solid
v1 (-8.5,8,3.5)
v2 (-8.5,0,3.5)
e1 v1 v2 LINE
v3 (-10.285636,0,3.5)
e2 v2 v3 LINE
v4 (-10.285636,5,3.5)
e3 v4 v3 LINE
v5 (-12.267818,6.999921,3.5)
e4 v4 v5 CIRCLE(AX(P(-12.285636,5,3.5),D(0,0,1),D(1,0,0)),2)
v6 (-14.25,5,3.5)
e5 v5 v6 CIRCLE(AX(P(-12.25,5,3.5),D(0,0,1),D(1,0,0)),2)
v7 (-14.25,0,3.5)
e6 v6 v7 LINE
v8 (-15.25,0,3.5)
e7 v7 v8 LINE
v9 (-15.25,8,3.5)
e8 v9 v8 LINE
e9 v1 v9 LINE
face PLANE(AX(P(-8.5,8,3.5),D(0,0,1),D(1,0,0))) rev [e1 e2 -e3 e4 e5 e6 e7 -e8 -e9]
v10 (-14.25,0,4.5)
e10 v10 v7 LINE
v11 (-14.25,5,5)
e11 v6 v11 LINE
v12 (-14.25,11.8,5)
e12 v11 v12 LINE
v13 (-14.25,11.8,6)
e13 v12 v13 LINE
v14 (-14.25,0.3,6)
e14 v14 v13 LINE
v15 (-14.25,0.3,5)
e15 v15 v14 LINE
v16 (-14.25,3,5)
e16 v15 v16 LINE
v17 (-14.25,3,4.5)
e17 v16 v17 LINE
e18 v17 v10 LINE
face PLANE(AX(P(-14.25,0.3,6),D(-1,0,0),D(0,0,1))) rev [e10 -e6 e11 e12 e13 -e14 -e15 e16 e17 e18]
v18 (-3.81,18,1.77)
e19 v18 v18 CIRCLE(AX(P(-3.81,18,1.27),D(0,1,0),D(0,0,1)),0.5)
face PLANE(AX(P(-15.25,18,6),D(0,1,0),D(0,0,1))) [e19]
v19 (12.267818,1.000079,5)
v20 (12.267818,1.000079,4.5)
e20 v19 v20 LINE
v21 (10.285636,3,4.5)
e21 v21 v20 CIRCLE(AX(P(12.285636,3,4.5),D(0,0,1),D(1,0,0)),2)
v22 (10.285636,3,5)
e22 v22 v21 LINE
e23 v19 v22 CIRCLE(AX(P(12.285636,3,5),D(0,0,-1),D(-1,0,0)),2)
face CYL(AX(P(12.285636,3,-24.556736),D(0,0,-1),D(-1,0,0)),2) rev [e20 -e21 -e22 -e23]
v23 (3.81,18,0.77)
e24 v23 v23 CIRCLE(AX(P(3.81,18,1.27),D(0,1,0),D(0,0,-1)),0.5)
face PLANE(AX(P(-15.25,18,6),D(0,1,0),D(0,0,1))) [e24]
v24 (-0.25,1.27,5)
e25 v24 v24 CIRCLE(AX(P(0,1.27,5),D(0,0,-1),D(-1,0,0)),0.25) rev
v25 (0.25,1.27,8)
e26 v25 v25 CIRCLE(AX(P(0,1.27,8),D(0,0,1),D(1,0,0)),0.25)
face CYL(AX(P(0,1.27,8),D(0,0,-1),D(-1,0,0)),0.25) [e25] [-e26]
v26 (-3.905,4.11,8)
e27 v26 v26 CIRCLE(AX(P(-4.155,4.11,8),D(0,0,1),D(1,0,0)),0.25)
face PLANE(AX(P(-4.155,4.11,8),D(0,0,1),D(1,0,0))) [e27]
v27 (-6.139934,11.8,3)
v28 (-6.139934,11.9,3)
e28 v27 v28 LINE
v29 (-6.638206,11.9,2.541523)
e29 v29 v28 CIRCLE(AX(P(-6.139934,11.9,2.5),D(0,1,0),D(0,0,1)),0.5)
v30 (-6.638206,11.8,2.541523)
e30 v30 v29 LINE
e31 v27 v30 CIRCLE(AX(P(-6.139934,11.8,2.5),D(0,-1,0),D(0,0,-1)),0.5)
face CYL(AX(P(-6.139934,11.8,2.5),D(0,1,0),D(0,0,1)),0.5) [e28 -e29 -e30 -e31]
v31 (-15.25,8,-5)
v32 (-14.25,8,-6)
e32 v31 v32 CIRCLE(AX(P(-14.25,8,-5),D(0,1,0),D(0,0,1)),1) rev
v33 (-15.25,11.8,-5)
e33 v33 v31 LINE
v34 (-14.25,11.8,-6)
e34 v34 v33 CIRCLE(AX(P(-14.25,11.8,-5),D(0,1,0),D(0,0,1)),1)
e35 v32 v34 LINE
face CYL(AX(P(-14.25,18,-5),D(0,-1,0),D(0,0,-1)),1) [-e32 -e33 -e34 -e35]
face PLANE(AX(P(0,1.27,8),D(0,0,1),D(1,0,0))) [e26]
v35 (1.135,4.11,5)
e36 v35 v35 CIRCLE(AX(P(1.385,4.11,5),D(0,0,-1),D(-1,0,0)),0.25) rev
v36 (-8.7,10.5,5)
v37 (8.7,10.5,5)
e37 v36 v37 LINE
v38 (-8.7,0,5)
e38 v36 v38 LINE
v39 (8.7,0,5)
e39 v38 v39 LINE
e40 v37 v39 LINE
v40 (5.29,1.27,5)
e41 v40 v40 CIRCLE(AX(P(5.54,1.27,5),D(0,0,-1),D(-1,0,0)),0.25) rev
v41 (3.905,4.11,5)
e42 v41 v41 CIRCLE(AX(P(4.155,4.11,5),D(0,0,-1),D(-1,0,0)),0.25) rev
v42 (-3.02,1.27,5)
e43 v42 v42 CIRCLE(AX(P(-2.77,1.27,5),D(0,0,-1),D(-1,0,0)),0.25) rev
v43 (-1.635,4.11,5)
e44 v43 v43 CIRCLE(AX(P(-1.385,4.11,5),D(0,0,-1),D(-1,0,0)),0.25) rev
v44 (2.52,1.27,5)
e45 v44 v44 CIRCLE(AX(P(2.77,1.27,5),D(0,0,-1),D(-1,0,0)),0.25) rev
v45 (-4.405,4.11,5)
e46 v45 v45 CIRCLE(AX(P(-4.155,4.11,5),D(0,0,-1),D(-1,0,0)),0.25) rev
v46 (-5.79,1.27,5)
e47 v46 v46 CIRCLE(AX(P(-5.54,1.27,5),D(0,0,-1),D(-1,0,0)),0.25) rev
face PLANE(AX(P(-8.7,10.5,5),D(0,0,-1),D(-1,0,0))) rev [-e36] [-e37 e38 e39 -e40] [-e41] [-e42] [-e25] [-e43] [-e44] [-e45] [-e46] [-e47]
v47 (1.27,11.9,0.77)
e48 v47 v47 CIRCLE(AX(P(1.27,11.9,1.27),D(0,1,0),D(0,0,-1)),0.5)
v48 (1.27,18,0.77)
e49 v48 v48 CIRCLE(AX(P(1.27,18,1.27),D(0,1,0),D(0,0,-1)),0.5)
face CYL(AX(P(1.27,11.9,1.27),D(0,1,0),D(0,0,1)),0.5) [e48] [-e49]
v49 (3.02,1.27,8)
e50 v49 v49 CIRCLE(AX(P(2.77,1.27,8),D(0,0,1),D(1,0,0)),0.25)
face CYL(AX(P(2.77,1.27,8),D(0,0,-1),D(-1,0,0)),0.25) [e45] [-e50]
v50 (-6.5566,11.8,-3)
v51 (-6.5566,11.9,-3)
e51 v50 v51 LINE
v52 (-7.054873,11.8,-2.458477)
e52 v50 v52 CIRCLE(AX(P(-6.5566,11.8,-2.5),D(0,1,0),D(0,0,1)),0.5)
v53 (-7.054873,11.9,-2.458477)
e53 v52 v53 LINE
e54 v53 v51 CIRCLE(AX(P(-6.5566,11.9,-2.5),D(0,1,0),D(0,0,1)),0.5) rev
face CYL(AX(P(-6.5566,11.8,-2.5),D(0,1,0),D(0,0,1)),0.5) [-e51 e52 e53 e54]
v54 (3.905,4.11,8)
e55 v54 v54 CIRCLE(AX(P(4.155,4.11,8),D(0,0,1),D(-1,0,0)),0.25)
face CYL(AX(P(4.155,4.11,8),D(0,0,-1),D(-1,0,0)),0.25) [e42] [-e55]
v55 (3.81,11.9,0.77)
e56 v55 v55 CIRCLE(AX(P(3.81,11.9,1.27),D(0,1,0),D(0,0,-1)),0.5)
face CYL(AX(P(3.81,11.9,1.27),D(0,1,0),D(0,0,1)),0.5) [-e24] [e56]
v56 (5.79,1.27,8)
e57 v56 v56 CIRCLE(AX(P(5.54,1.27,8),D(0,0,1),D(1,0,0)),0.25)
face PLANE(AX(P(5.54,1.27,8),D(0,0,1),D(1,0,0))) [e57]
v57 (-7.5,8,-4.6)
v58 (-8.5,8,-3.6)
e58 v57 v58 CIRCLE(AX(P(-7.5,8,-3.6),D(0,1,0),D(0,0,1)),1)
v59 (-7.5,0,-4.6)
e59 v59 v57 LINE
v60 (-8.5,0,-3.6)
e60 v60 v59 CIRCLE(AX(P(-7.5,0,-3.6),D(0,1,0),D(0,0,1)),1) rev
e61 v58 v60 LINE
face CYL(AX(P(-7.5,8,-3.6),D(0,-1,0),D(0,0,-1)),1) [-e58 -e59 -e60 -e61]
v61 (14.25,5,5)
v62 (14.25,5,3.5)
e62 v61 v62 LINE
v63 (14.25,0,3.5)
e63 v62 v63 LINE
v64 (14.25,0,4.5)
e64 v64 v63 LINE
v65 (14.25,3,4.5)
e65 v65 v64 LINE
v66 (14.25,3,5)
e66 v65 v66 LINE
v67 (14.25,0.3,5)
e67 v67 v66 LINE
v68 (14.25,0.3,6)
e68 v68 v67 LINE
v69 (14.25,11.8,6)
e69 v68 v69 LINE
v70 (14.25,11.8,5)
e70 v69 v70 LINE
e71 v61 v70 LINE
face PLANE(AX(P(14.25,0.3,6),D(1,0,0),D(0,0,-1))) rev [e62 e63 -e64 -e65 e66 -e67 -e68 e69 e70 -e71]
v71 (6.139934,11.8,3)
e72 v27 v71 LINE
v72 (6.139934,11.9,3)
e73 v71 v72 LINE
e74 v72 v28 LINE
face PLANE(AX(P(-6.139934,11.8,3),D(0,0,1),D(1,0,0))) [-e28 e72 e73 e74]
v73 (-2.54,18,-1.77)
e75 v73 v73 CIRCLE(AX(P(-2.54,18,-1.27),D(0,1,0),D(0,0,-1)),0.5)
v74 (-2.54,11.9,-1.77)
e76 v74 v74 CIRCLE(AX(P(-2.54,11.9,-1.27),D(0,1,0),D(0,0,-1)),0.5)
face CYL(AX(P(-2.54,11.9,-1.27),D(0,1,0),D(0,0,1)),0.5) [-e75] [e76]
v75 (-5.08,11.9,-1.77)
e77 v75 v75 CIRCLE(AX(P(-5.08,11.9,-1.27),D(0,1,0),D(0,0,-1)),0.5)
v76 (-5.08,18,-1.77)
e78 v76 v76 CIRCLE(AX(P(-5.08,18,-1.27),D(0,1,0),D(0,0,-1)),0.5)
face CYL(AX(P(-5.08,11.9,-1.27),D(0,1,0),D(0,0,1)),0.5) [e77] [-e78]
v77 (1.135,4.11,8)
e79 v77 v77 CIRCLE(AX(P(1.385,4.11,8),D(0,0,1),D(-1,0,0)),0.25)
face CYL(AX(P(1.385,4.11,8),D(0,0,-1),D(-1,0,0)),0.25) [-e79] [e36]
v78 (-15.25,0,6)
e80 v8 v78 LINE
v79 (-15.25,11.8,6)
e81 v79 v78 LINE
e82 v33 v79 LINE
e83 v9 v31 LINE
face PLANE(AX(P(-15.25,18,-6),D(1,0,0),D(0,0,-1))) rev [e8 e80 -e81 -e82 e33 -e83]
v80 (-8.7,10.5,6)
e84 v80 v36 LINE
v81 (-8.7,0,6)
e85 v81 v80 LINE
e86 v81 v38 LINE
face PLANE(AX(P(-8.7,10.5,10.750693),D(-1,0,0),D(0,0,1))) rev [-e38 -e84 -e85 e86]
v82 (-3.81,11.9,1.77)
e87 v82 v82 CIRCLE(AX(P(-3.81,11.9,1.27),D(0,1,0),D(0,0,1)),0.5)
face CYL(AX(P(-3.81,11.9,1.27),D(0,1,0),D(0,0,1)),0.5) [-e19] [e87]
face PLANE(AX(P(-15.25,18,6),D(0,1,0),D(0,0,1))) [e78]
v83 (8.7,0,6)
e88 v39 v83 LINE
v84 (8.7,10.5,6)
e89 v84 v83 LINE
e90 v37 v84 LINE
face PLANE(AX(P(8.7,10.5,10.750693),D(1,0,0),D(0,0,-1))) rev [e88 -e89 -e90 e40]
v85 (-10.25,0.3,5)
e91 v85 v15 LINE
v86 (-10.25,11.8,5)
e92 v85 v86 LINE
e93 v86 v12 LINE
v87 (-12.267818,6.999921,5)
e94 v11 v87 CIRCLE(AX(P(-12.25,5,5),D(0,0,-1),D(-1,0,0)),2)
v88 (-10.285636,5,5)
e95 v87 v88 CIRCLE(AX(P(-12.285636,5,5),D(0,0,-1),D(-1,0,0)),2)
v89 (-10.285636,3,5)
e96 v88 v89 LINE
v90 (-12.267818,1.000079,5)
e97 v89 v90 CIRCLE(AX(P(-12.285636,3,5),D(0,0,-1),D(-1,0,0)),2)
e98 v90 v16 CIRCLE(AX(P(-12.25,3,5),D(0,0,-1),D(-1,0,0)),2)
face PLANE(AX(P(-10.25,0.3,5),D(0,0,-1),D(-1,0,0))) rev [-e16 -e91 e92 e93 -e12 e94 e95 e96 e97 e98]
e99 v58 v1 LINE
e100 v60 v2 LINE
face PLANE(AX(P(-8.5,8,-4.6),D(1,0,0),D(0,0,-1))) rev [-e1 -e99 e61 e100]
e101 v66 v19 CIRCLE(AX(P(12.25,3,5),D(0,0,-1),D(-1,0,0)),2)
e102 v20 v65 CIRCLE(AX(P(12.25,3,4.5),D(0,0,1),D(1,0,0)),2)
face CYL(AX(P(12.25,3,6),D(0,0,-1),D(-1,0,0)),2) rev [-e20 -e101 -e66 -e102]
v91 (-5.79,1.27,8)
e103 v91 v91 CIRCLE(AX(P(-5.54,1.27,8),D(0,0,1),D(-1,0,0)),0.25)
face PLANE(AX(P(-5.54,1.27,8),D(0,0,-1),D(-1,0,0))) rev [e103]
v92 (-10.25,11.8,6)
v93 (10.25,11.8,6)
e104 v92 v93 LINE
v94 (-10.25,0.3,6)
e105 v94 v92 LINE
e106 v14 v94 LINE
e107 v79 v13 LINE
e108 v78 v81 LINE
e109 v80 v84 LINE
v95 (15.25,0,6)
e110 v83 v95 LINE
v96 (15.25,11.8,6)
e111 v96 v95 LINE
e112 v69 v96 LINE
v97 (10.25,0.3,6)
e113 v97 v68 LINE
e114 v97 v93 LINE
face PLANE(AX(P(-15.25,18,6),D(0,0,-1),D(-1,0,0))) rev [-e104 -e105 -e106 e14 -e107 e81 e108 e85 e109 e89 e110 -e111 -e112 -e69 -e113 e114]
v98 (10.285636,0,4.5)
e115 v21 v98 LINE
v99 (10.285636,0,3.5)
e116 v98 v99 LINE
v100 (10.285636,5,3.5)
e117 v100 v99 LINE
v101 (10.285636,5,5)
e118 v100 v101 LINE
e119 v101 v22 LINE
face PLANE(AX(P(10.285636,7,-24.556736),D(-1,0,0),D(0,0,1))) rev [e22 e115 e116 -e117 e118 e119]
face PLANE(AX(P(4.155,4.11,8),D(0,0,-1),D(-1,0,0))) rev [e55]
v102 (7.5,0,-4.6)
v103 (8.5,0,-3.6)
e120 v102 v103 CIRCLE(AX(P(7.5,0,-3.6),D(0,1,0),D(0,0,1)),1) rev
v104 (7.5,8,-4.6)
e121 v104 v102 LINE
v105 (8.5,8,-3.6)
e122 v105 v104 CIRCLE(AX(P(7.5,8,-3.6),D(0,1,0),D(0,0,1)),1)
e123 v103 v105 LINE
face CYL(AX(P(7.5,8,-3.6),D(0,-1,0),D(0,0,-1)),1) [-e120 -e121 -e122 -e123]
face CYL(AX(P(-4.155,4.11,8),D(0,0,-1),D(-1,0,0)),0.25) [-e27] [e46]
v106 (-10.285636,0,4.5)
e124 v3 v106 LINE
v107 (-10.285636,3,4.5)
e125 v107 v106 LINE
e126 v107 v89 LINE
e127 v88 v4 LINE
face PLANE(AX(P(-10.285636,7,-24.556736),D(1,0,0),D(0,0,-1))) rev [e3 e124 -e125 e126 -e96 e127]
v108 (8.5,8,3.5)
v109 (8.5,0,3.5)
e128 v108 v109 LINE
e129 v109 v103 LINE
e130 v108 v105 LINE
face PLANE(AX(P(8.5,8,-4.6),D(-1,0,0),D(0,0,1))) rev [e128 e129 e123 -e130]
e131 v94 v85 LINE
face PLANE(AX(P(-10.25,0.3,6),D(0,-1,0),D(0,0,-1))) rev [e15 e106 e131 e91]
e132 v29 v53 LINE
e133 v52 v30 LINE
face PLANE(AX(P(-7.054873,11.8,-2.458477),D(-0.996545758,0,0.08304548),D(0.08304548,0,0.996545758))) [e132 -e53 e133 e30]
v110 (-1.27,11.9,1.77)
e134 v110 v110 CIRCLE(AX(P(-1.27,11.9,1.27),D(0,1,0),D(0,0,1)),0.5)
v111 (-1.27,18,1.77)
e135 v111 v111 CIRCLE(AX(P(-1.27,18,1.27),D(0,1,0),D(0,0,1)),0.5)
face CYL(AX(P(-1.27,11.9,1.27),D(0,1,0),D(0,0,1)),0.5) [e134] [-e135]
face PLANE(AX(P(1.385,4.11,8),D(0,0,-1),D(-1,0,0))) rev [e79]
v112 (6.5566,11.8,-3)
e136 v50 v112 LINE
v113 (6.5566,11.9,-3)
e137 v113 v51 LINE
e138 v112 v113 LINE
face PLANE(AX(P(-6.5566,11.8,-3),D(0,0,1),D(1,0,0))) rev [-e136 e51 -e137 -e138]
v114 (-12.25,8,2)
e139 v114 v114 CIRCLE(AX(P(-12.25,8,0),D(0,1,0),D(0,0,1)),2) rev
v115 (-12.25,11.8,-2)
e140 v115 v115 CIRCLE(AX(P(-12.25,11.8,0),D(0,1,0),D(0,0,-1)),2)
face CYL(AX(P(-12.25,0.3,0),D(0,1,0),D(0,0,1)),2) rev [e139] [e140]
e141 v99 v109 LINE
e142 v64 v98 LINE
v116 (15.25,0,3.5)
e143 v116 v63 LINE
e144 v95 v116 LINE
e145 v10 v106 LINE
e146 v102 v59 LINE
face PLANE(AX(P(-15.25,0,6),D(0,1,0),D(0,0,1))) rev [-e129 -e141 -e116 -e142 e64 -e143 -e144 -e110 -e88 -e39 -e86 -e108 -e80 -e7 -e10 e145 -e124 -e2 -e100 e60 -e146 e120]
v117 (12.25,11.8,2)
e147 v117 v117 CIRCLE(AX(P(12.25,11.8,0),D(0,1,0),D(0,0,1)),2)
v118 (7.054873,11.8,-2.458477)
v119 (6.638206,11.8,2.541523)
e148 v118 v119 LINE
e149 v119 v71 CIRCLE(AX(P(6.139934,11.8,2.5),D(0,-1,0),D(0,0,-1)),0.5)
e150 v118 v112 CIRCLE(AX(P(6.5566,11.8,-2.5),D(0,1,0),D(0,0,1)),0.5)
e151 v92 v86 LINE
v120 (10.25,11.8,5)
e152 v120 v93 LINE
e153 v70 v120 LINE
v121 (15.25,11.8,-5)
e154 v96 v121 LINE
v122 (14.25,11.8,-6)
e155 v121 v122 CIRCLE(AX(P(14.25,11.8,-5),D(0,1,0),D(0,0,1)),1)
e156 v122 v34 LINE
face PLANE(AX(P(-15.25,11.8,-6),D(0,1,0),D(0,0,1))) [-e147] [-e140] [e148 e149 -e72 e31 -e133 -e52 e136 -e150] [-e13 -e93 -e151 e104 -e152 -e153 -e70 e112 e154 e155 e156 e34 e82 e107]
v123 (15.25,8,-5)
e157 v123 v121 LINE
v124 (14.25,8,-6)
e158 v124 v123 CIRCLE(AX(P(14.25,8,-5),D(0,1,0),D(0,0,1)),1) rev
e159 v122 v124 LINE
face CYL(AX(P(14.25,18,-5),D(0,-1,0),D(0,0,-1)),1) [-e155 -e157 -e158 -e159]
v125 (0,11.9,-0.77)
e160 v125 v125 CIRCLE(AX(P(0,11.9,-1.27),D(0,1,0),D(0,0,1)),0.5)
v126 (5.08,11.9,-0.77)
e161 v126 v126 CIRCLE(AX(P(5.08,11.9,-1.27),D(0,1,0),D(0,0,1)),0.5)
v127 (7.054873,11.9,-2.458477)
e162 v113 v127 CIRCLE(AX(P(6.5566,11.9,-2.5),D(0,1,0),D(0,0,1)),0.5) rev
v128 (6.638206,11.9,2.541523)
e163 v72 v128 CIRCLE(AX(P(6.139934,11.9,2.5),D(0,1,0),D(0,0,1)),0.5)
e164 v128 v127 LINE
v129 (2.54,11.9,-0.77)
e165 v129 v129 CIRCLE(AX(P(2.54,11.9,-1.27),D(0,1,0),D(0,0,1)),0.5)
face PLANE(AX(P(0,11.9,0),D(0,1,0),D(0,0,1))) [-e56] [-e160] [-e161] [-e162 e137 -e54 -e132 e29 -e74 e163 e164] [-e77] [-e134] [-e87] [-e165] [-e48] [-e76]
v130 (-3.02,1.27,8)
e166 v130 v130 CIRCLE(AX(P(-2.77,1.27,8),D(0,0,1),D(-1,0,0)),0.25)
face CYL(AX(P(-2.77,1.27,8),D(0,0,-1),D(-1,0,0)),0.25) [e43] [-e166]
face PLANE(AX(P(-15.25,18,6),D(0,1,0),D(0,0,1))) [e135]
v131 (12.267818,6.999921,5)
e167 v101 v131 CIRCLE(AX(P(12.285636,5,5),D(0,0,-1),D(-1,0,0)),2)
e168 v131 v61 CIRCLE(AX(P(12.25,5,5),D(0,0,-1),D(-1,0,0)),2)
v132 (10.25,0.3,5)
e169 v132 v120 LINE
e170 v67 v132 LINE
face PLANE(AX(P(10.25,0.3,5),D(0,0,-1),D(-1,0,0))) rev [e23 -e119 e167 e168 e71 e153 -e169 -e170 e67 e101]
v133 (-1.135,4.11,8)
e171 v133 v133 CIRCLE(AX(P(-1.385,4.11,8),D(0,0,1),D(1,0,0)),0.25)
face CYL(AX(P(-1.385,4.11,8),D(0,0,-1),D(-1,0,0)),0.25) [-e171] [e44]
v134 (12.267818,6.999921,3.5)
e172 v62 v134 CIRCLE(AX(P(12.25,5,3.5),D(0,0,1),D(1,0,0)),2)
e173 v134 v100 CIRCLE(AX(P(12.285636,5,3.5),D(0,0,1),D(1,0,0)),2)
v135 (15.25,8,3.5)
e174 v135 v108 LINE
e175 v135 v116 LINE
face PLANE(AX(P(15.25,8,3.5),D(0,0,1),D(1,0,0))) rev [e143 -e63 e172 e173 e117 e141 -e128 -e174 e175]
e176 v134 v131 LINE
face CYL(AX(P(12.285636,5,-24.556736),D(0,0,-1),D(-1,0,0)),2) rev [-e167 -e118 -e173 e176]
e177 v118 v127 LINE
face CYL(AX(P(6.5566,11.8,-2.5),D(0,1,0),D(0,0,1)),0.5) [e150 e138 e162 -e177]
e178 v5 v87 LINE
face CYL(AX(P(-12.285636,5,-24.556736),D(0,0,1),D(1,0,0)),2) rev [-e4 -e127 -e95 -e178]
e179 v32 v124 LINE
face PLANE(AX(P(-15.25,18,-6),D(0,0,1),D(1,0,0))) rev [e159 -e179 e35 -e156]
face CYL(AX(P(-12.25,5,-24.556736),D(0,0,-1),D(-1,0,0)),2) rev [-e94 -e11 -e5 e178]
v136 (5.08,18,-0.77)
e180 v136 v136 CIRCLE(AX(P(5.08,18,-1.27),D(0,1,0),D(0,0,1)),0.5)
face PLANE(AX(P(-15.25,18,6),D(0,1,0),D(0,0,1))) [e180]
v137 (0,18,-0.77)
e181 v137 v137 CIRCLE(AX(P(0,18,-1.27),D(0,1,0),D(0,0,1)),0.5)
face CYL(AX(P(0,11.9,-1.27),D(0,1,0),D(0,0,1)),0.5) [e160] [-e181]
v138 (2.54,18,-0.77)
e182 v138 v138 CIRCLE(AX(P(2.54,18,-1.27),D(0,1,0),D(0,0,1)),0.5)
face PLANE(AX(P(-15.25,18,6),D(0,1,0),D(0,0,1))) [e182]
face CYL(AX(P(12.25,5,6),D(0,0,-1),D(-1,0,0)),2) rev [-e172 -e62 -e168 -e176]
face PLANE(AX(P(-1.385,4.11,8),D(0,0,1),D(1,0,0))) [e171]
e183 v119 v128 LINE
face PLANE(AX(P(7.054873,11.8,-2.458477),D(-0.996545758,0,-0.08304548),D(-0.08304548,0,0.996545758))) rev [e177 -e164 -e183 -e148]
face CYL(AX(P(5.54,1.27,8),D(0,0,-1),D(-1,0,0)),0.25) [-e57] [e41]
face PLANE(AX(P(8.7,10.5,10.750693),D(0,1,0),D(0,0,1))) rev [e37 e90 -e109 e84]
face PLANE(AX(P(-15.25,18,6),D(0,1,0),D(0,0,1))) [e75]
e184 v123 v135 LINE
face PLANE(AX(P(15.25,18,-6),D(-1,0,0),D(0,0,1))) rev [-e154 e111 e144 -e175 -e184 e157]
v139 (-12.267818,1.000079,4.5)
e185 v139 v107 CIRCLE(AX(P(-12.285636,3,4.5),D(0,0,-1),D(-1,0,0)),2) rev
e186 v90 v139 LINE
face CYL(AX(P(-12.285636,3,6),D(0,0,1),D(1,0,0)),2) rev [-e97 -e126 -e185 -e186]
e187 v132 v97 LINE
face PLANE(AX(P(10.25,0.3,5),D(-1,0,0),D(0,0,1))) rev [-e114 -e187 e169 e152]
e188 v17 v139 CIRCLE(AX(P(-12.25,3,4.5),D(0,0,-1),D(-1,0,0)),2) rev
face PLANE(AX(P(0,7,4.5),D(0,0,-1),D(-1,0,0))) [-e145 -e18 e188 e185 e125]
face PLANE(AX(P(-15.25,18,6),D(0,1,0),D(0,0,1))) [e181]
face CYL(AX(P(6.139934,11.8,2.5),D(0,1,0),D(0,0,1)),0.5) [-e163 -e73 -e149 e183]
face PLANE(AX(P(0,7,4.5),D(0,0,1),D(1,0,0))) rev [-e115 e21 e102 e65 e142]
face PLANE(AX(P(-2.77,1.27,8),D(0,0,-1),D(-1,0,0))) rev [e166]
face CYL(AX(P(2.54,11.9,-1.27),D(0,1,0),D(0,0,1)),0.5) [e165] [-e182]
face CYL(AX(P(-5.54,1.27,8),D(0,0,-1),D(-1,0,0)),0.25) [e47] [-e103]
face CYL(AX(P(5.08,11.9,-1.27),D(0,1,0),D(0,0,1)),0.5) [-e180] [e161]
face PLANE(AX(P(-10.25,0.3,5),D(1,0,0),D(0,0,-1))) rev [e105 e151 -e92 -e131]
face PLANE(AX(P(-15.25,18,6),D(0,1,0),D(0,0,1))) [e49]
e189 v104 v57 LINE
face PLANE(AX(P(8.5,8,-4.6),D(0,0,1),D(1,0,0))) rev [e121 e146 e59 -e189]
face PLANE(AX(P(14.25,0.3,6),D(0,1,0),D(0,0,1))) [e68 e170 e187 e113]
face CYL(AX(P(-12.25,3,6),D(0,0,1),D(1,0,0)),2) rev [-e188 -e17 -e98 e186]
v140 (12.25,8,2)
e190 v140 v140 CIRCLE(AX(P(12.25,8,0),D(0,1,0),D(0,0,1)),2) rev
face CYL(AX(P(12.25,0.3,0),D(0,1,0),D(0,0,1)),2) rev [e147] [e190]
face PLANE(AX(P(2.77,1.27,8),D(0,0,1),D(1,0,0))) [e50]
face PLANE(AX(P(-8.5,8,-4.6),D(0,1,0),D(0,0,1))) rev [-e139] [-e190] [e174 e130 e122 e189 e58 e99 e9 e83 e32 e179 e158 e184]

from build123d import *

# Parameters (mm, degrees)
SKETCH_1_W          = 30.5
SKETCH_1_H          = 12
EXTRUDE_1_DEPTH     = 18
SKETCH_2_W          = 30.5
SKETCH_2_H          = 12
CUT_EXTRUDE_2_DEPTH = 6.2
SKETCH_3_R          = 2
SKETCH_3_W          = 4
SKETCH_3_H          = 1
CUT_EXTRUDE_3_DEPTH = 11.5
CUT_EXTRUDE_4_DEPTH = 8
SKETCH_5_W          = 3.964363922
SKETCH_5_H          = 1
CUT_EXTRUDE_6_DEPTH = 7
SKETCH_6_W          = 3.964363922
SKETCH_6_H          = 6
CUT_EXTRUDE_7_DEPTH = 26.822712871
FILLET_1_R          = 2
FILLET_2_R          = 2
FILLET_3_R          = 1
SKETCH_7_W          = 17.4
SKETCH_7_H          = 5.750693342
CUT_EXTRUDE_8_DEPTH = 10.5
SKETCH_9_OUTSIDE_W  = 39.978
SKETCH_9_OUTSIDE_H  = 21.478
SKETCH_9_OUTSIDE_R  = 0.5
CUT_EXTRUDE_9_DEPTH = 6.1
SKETCH_8_R          = 0.25
EXTRUDE_2_DEPTH     = 3


with BuildPart() as part:
    # 草图1 → 凸台-拉伸1 (new body)
    with BuildSketch(Plane(origin=(0, 0, 0), x_dir=(1, 0, 0), z_dir=(0, 1, 0))):
        Rectangle(SKETCH_1_W, SKETCH_1_H)
    extrude(amount=EXTRUDE_1_DEPTH)

    # 草图2 → 切除-拉伸2 (cut)
    with BuildSketch(Plane(origin=(0, 18, 0), x_dir=(1, 0, 0), z_dir=(0, 1, 0))):
        Rectangle(SKETCH_2_W, SKETCH_2_H)
        with BuildLine():
            Line((-6.556600226, 3), (6.556600226, 3))
            ThreePointArc((6.556600226, 3), (6.924541369, 2.838554744), (7.054873105, 2.45847726))
            Line((7.054873105, 2.45847726), (6.638206438, -2.54152274))
            ThreePointArc((6.638206438, -2.54152274), (6.478488304, -2.867941143), (6.139933559, -3))
            Line((6.139933559, -3), (-6.139933559, -3))
            ThreePointArc((-6.139933559, -3), (-6.478488304, -2.867941143), (-6.638206438, -2.54152274))
            Line((-6.638206438, -2.54152274), (-7.054873105, 2.45847726))
            ThreePointArc((-7.054873105, 2.45847726), (-6.924541369, 2.838554744), (-6.556600226, 3))
        make_face(mode=Mode.SUBTRACT)
    extrude(amount=-CUT_EXTRUDE_2_DEPTH, mode=Mode.SUBTRACT)

    # 草图3 → 切除-拉伸3 (cut)
    with BuildSketch(Plane(origin=(0, 11.8, 0), x_dir=(1, 0, 0), z_dir=(0, 1, 0))):
        with Locations(Location((12.25, 0, 0), (0, 0, 270))):
            Circle(SKETCH_3_R)
        with Locations(Location((-12.25, 0, 0), (0, 0, 90))):
            Circle(SKETCH_3_R)
        with Locations((12.25, -5.5)):
            Rectangle(SKETCH_3_W, SKETCH_3_H)
        with Locations((-12.25, -5.5)):
            Rectangle(SKETCH_3_W, SKETCH_3_H)
    extrude(amount=-CUT_EXTRUDE_3_DEPTH, mode=Mode.SUBTRACT)

    # 草图4 → 切除-拉伸4 (cut)
    with BuildSketch(Plane.XZ):
        Polygon((8.5, -4.6), (8.5, 3.5), (15.25, 3.5), (15.25, -4.6), (15.25, -6), (-15.25, -6), (-15.25, 3.5), (-8.5, 3.5), (-8.5, -4.6), align=None)
    extrude(amount=-CUT_EXTRUDE_4_DEPTH, mode=Mode.SUBTRACT)

    # 草图5 → 切除-拉伸6 (cut)
    with BuildSketch(Plane.XZ):
        with Locations((12.267818039, 4)):
            Rectangle(SKETCH_5_W, SKETCH_5_H)
        with Locations((-12.267818039, 4)):
            Rectangle(SKETCH_5_W, SKETCH_5_H)
    extrude(amount=-CUT_EXTRUDE_6_DEPTH, mode=Mode.SUBTRACT)

    # 草图6 → 切除-拉伸7 (cut, through all)
    with BuildSketch(Plane(origin=(0, 0, 4.5), x_dir=(-1, 0, 0), z_dir=(0, 0, -1))):
        with Locations((12.267818039, 4)):
            Rectangle(SKETCH_6_W, SKETCH_6_H)
    cut_extrude_7 = extrude(amount=-CUT_EXTRUDE_7_DEPTH, mode=Mode.SUBTRACT)

    # 圆角1
    # the kernel refuses this fillet: 2 mm, written as the material it adds along each edge
    with BuildSketch(Plane(origin=(-14.25, 1, 4.5), x_dir=(0, 1, 0), z_dir=(0, 0, 1)), Plane(origin=(-10.285636078, 1, 4.5), x_dir=(-1, 0, 0), z_dir=(0, 0, 1))) as fillet_1_piece_1:
        with BuildLine():
            CenterArc((FILLET_1_R, -FILLET_1_R), FILLET_1_R, 90, 90)
            Line((0, -FILLET_1_R), (0, 0))
            Line((0, 0), (FILLET_1_R, 0))
        make_face()
    extrude(amount=0.5)
    with BuildSketch(Plane(origin=(-14.25, 7, 3.5), x_dir=(0, -1, 0), z_dir=(0, 0, 1))) as fillet_1_piece_2:
        with BuildLine():
            CenterArc((FILLET_1_R, FILLET_1_R), FILLET_1_R, 180, 90)
            Line((0, FILLET_1_R), (0, 0))
            Line((0, 0), (FILLET_1_R, 0))
        make_face()
    extrude(amount=1.5)
    with BuildSketch(Plane(origin=(-10.285636078, 7, 3.5), x_dir=(0, -1, 0), z_dir=(0, 0, 1))) as fillet_1_piece_3:
        with BuildLine():
            CenterArc((FILLET_1_R, -FILLET_1_R), FILLET_1_R, 90, 90)
            Line((0, -FILLET_1_R), (0, 0))
            Line((0, 0), (FILLET_1_R, 0))
        make_face()
    extrude(amount=1.5)

    # 镜向1: 切除-拉伸7 across plane
    add(cut_extrude_7.mirror(Plane(origin=(0, 0, 0), x_dir=(0, 0, 1), z_dir=(1, 0, 0))), mode=Mode.SUBTRACT)

    # 圆角2
    # the kernel refuses this fillet: 2 mm, written as the material it adds along each edge
    with BuildSketch(Plane(origin=(14.25, 1, 4.5), x_dir=(-1, 0, 0), z_dir=(0, 0, 1))) as fillet_2_piece_1:
        with BuildLine():
            CenterArc((FILLET_2_R, -FILLET_2_R), FILLET_2_R, 90, 90)
            Line((0, -FILLET_2_R), (0, 0))
            Line((0, 0), (FILLET_2_R, 0))
        make_face()
    extrude(amount=0.5)
    with BuildSketch(Plane(origin=(10.285636078, 1, 4.5), x_dir=(1, 0, 0), z_dir=(0, 0, 1))) as fillet_2_piece_2:
        with BuildLine():
            CenterArc((FILLET_2_R, FILLET_2_R), FILLET_2_R, 180, 90)
            Line((0, FILLET_2_R), (0, 0))
            Line((0, 0), (FILLET_2_R, 0))
        make_face()
    extrude(amount=0.5)
    with BuildSketch(Plane(origin=(10.285636078, 7, 3.5), x_dir=(1, 0, 0), z_dir=(0, 0, 1)), Plane(origin=(14.25, 7, 5), x_dir=(-1, 0, 0), z_dir=(0, 0, -1))) as fillet_2_piece_3:
        with BuildLine():
            CenterArc((FILLET_2_R, -FILLET_2_R), FILLET_2_R, 90, 90)
            Line((0, -FILLET_2_R), (0, 0))
            Line((0, 0), (FILLET_2_R, 0))
        make_face()
    extrude(amount=1.5)

    # 圆角3
    fillet_3_edges = [part.edges().sort_by_distance(p)[0] for p in [
        (-15.25, 9.9, -6),
        (15.25, 9.9, -6),
        (-8.5, 4, -4.6),
        (8.5, 4, -4.6),
    ]]
    fillet(fillet_3_edges, radius=FILLET_3_R)

    # 草图7 → 切除-拉伸8 (cut)
    with BuildSketch(Plane.XZ):
        with Locations((0, 7.875346671)):
            Rectangle(SKETCH_7_W, SKETCH_7_H)
    extrude(amount=-CUT_EXTRUDE_8_DEPTH, mode=Mode.SUBTRACT)

    # 草图9 outside → 切除-拉伸9 (cut)
    with BuildSketch(Plane(origin=(0, 18, 0), x_dir=(1, 0, 0), z_dir=(0, 1, 0))):
        Rectangle(SKETCH_9_OUTSIDE_W, SKETCH_9_OUTSIDE_H)
        with Locations(Location((0, 1.27, 0), (0, 0, 270))):
            Circle(SKETCH_9_OUTSIDE_R, mode=Mode.SUBTRACT)
        with Locations(Location((2.54, 1.27, 0), (0, 0, 270))):
            Circle(SKETCH_9_OUTSIDE_R, mode=Mode.SUBTRACT)
        with Locations(Location((5.08, 1.27, 0), (0, 0, 270))):
            Circle(SKETCH_9_OUTSIDE_R, mode=Mode.SUBTRACT)
        with Locations(Location((-5.08, 1.27, 0), (0, 0, 90))):
            Circle(SKETCH_9_OUTSIDE_R, mode=Mode.SUBTRACT)
        with Locations(Location((-2.54, 1.27, 0), (0, 0, 90))):
            Circle(SKETCH_9_OUTSIDE_R, mode=Mode.SUBTRACT)
        with Locations(Location((-1.27, -1.27, 0), (0, 0, 270))):
            Circle(SKETCH_9_OUTSIDE_R, mode=Mode.SUBTRACT)
        with Locations(Location((-3.81, -1.27, 0), (0, 0, 270))):
            Circle(SKETCH_9_OUTSIDE_R, mode=Mode.SUBTRACT)
        with Locations(Location((3.81, -1.27, 0), (0, 0, 90))):
            Circle(SKETCH_9_OUTSIDE_R, mode=Mode.SUBTRACT)
        with Locations(Location((1.27, -1.27, 0), (0, 0, 90))):
            Circle(SKETCH_9_OUTSIDE_R, mode=Mode.SUBTRACT)
    extrude(amount=-CUT_EXTRUDE_9_DEPTH, mode=Mode.SUBTRACT)

    # 草图8 → 凸台-拉伸2 (add)
    with BuildSketch(Plane.XY.offset(5)):
        with Locations(Location((0, 1.27, 0), (0, 0, 180))):
            Circle(SKETCH_8_R)
        with Locations(Location((2.77, 1.27, 0), (0, 0, 180))):
            Circle(SKETCH_8_R)
        with Locations(Location((5.54, 1.27, 0), (0, 0, 180))):
            Circle(SKETCH_8_R)
        with Locations(Location((-5.54, 1.27, 0), (0, 0, 180))):
            Circle(SKETCH_8_R)
        with Locations(Location((-2.77, 1.27, 0), (0, 0, 180))):
            Circle(SKETCH_8_R)
        with Locations(Location((-1.385, 4.11, 0), (0, 0, 180))):
            Circle(SKETCH_8_R)
        with Locations(Location((1.385, 4.11, 0), (0, 0, 180))):
            Circle(SKETCH_8_R)
        with Locations(Location((-4.155, 4.11, 0), (0, 0, 180))):
            Circle(SKETCH_8_R)
        with Locations(Location((4.155, 4.11, 0), (0, 0, 180))):
            Circle(SKETCH_8_R)
    extrude(amount=EXTRUDE_2_DEPTH)


solid = part.part
